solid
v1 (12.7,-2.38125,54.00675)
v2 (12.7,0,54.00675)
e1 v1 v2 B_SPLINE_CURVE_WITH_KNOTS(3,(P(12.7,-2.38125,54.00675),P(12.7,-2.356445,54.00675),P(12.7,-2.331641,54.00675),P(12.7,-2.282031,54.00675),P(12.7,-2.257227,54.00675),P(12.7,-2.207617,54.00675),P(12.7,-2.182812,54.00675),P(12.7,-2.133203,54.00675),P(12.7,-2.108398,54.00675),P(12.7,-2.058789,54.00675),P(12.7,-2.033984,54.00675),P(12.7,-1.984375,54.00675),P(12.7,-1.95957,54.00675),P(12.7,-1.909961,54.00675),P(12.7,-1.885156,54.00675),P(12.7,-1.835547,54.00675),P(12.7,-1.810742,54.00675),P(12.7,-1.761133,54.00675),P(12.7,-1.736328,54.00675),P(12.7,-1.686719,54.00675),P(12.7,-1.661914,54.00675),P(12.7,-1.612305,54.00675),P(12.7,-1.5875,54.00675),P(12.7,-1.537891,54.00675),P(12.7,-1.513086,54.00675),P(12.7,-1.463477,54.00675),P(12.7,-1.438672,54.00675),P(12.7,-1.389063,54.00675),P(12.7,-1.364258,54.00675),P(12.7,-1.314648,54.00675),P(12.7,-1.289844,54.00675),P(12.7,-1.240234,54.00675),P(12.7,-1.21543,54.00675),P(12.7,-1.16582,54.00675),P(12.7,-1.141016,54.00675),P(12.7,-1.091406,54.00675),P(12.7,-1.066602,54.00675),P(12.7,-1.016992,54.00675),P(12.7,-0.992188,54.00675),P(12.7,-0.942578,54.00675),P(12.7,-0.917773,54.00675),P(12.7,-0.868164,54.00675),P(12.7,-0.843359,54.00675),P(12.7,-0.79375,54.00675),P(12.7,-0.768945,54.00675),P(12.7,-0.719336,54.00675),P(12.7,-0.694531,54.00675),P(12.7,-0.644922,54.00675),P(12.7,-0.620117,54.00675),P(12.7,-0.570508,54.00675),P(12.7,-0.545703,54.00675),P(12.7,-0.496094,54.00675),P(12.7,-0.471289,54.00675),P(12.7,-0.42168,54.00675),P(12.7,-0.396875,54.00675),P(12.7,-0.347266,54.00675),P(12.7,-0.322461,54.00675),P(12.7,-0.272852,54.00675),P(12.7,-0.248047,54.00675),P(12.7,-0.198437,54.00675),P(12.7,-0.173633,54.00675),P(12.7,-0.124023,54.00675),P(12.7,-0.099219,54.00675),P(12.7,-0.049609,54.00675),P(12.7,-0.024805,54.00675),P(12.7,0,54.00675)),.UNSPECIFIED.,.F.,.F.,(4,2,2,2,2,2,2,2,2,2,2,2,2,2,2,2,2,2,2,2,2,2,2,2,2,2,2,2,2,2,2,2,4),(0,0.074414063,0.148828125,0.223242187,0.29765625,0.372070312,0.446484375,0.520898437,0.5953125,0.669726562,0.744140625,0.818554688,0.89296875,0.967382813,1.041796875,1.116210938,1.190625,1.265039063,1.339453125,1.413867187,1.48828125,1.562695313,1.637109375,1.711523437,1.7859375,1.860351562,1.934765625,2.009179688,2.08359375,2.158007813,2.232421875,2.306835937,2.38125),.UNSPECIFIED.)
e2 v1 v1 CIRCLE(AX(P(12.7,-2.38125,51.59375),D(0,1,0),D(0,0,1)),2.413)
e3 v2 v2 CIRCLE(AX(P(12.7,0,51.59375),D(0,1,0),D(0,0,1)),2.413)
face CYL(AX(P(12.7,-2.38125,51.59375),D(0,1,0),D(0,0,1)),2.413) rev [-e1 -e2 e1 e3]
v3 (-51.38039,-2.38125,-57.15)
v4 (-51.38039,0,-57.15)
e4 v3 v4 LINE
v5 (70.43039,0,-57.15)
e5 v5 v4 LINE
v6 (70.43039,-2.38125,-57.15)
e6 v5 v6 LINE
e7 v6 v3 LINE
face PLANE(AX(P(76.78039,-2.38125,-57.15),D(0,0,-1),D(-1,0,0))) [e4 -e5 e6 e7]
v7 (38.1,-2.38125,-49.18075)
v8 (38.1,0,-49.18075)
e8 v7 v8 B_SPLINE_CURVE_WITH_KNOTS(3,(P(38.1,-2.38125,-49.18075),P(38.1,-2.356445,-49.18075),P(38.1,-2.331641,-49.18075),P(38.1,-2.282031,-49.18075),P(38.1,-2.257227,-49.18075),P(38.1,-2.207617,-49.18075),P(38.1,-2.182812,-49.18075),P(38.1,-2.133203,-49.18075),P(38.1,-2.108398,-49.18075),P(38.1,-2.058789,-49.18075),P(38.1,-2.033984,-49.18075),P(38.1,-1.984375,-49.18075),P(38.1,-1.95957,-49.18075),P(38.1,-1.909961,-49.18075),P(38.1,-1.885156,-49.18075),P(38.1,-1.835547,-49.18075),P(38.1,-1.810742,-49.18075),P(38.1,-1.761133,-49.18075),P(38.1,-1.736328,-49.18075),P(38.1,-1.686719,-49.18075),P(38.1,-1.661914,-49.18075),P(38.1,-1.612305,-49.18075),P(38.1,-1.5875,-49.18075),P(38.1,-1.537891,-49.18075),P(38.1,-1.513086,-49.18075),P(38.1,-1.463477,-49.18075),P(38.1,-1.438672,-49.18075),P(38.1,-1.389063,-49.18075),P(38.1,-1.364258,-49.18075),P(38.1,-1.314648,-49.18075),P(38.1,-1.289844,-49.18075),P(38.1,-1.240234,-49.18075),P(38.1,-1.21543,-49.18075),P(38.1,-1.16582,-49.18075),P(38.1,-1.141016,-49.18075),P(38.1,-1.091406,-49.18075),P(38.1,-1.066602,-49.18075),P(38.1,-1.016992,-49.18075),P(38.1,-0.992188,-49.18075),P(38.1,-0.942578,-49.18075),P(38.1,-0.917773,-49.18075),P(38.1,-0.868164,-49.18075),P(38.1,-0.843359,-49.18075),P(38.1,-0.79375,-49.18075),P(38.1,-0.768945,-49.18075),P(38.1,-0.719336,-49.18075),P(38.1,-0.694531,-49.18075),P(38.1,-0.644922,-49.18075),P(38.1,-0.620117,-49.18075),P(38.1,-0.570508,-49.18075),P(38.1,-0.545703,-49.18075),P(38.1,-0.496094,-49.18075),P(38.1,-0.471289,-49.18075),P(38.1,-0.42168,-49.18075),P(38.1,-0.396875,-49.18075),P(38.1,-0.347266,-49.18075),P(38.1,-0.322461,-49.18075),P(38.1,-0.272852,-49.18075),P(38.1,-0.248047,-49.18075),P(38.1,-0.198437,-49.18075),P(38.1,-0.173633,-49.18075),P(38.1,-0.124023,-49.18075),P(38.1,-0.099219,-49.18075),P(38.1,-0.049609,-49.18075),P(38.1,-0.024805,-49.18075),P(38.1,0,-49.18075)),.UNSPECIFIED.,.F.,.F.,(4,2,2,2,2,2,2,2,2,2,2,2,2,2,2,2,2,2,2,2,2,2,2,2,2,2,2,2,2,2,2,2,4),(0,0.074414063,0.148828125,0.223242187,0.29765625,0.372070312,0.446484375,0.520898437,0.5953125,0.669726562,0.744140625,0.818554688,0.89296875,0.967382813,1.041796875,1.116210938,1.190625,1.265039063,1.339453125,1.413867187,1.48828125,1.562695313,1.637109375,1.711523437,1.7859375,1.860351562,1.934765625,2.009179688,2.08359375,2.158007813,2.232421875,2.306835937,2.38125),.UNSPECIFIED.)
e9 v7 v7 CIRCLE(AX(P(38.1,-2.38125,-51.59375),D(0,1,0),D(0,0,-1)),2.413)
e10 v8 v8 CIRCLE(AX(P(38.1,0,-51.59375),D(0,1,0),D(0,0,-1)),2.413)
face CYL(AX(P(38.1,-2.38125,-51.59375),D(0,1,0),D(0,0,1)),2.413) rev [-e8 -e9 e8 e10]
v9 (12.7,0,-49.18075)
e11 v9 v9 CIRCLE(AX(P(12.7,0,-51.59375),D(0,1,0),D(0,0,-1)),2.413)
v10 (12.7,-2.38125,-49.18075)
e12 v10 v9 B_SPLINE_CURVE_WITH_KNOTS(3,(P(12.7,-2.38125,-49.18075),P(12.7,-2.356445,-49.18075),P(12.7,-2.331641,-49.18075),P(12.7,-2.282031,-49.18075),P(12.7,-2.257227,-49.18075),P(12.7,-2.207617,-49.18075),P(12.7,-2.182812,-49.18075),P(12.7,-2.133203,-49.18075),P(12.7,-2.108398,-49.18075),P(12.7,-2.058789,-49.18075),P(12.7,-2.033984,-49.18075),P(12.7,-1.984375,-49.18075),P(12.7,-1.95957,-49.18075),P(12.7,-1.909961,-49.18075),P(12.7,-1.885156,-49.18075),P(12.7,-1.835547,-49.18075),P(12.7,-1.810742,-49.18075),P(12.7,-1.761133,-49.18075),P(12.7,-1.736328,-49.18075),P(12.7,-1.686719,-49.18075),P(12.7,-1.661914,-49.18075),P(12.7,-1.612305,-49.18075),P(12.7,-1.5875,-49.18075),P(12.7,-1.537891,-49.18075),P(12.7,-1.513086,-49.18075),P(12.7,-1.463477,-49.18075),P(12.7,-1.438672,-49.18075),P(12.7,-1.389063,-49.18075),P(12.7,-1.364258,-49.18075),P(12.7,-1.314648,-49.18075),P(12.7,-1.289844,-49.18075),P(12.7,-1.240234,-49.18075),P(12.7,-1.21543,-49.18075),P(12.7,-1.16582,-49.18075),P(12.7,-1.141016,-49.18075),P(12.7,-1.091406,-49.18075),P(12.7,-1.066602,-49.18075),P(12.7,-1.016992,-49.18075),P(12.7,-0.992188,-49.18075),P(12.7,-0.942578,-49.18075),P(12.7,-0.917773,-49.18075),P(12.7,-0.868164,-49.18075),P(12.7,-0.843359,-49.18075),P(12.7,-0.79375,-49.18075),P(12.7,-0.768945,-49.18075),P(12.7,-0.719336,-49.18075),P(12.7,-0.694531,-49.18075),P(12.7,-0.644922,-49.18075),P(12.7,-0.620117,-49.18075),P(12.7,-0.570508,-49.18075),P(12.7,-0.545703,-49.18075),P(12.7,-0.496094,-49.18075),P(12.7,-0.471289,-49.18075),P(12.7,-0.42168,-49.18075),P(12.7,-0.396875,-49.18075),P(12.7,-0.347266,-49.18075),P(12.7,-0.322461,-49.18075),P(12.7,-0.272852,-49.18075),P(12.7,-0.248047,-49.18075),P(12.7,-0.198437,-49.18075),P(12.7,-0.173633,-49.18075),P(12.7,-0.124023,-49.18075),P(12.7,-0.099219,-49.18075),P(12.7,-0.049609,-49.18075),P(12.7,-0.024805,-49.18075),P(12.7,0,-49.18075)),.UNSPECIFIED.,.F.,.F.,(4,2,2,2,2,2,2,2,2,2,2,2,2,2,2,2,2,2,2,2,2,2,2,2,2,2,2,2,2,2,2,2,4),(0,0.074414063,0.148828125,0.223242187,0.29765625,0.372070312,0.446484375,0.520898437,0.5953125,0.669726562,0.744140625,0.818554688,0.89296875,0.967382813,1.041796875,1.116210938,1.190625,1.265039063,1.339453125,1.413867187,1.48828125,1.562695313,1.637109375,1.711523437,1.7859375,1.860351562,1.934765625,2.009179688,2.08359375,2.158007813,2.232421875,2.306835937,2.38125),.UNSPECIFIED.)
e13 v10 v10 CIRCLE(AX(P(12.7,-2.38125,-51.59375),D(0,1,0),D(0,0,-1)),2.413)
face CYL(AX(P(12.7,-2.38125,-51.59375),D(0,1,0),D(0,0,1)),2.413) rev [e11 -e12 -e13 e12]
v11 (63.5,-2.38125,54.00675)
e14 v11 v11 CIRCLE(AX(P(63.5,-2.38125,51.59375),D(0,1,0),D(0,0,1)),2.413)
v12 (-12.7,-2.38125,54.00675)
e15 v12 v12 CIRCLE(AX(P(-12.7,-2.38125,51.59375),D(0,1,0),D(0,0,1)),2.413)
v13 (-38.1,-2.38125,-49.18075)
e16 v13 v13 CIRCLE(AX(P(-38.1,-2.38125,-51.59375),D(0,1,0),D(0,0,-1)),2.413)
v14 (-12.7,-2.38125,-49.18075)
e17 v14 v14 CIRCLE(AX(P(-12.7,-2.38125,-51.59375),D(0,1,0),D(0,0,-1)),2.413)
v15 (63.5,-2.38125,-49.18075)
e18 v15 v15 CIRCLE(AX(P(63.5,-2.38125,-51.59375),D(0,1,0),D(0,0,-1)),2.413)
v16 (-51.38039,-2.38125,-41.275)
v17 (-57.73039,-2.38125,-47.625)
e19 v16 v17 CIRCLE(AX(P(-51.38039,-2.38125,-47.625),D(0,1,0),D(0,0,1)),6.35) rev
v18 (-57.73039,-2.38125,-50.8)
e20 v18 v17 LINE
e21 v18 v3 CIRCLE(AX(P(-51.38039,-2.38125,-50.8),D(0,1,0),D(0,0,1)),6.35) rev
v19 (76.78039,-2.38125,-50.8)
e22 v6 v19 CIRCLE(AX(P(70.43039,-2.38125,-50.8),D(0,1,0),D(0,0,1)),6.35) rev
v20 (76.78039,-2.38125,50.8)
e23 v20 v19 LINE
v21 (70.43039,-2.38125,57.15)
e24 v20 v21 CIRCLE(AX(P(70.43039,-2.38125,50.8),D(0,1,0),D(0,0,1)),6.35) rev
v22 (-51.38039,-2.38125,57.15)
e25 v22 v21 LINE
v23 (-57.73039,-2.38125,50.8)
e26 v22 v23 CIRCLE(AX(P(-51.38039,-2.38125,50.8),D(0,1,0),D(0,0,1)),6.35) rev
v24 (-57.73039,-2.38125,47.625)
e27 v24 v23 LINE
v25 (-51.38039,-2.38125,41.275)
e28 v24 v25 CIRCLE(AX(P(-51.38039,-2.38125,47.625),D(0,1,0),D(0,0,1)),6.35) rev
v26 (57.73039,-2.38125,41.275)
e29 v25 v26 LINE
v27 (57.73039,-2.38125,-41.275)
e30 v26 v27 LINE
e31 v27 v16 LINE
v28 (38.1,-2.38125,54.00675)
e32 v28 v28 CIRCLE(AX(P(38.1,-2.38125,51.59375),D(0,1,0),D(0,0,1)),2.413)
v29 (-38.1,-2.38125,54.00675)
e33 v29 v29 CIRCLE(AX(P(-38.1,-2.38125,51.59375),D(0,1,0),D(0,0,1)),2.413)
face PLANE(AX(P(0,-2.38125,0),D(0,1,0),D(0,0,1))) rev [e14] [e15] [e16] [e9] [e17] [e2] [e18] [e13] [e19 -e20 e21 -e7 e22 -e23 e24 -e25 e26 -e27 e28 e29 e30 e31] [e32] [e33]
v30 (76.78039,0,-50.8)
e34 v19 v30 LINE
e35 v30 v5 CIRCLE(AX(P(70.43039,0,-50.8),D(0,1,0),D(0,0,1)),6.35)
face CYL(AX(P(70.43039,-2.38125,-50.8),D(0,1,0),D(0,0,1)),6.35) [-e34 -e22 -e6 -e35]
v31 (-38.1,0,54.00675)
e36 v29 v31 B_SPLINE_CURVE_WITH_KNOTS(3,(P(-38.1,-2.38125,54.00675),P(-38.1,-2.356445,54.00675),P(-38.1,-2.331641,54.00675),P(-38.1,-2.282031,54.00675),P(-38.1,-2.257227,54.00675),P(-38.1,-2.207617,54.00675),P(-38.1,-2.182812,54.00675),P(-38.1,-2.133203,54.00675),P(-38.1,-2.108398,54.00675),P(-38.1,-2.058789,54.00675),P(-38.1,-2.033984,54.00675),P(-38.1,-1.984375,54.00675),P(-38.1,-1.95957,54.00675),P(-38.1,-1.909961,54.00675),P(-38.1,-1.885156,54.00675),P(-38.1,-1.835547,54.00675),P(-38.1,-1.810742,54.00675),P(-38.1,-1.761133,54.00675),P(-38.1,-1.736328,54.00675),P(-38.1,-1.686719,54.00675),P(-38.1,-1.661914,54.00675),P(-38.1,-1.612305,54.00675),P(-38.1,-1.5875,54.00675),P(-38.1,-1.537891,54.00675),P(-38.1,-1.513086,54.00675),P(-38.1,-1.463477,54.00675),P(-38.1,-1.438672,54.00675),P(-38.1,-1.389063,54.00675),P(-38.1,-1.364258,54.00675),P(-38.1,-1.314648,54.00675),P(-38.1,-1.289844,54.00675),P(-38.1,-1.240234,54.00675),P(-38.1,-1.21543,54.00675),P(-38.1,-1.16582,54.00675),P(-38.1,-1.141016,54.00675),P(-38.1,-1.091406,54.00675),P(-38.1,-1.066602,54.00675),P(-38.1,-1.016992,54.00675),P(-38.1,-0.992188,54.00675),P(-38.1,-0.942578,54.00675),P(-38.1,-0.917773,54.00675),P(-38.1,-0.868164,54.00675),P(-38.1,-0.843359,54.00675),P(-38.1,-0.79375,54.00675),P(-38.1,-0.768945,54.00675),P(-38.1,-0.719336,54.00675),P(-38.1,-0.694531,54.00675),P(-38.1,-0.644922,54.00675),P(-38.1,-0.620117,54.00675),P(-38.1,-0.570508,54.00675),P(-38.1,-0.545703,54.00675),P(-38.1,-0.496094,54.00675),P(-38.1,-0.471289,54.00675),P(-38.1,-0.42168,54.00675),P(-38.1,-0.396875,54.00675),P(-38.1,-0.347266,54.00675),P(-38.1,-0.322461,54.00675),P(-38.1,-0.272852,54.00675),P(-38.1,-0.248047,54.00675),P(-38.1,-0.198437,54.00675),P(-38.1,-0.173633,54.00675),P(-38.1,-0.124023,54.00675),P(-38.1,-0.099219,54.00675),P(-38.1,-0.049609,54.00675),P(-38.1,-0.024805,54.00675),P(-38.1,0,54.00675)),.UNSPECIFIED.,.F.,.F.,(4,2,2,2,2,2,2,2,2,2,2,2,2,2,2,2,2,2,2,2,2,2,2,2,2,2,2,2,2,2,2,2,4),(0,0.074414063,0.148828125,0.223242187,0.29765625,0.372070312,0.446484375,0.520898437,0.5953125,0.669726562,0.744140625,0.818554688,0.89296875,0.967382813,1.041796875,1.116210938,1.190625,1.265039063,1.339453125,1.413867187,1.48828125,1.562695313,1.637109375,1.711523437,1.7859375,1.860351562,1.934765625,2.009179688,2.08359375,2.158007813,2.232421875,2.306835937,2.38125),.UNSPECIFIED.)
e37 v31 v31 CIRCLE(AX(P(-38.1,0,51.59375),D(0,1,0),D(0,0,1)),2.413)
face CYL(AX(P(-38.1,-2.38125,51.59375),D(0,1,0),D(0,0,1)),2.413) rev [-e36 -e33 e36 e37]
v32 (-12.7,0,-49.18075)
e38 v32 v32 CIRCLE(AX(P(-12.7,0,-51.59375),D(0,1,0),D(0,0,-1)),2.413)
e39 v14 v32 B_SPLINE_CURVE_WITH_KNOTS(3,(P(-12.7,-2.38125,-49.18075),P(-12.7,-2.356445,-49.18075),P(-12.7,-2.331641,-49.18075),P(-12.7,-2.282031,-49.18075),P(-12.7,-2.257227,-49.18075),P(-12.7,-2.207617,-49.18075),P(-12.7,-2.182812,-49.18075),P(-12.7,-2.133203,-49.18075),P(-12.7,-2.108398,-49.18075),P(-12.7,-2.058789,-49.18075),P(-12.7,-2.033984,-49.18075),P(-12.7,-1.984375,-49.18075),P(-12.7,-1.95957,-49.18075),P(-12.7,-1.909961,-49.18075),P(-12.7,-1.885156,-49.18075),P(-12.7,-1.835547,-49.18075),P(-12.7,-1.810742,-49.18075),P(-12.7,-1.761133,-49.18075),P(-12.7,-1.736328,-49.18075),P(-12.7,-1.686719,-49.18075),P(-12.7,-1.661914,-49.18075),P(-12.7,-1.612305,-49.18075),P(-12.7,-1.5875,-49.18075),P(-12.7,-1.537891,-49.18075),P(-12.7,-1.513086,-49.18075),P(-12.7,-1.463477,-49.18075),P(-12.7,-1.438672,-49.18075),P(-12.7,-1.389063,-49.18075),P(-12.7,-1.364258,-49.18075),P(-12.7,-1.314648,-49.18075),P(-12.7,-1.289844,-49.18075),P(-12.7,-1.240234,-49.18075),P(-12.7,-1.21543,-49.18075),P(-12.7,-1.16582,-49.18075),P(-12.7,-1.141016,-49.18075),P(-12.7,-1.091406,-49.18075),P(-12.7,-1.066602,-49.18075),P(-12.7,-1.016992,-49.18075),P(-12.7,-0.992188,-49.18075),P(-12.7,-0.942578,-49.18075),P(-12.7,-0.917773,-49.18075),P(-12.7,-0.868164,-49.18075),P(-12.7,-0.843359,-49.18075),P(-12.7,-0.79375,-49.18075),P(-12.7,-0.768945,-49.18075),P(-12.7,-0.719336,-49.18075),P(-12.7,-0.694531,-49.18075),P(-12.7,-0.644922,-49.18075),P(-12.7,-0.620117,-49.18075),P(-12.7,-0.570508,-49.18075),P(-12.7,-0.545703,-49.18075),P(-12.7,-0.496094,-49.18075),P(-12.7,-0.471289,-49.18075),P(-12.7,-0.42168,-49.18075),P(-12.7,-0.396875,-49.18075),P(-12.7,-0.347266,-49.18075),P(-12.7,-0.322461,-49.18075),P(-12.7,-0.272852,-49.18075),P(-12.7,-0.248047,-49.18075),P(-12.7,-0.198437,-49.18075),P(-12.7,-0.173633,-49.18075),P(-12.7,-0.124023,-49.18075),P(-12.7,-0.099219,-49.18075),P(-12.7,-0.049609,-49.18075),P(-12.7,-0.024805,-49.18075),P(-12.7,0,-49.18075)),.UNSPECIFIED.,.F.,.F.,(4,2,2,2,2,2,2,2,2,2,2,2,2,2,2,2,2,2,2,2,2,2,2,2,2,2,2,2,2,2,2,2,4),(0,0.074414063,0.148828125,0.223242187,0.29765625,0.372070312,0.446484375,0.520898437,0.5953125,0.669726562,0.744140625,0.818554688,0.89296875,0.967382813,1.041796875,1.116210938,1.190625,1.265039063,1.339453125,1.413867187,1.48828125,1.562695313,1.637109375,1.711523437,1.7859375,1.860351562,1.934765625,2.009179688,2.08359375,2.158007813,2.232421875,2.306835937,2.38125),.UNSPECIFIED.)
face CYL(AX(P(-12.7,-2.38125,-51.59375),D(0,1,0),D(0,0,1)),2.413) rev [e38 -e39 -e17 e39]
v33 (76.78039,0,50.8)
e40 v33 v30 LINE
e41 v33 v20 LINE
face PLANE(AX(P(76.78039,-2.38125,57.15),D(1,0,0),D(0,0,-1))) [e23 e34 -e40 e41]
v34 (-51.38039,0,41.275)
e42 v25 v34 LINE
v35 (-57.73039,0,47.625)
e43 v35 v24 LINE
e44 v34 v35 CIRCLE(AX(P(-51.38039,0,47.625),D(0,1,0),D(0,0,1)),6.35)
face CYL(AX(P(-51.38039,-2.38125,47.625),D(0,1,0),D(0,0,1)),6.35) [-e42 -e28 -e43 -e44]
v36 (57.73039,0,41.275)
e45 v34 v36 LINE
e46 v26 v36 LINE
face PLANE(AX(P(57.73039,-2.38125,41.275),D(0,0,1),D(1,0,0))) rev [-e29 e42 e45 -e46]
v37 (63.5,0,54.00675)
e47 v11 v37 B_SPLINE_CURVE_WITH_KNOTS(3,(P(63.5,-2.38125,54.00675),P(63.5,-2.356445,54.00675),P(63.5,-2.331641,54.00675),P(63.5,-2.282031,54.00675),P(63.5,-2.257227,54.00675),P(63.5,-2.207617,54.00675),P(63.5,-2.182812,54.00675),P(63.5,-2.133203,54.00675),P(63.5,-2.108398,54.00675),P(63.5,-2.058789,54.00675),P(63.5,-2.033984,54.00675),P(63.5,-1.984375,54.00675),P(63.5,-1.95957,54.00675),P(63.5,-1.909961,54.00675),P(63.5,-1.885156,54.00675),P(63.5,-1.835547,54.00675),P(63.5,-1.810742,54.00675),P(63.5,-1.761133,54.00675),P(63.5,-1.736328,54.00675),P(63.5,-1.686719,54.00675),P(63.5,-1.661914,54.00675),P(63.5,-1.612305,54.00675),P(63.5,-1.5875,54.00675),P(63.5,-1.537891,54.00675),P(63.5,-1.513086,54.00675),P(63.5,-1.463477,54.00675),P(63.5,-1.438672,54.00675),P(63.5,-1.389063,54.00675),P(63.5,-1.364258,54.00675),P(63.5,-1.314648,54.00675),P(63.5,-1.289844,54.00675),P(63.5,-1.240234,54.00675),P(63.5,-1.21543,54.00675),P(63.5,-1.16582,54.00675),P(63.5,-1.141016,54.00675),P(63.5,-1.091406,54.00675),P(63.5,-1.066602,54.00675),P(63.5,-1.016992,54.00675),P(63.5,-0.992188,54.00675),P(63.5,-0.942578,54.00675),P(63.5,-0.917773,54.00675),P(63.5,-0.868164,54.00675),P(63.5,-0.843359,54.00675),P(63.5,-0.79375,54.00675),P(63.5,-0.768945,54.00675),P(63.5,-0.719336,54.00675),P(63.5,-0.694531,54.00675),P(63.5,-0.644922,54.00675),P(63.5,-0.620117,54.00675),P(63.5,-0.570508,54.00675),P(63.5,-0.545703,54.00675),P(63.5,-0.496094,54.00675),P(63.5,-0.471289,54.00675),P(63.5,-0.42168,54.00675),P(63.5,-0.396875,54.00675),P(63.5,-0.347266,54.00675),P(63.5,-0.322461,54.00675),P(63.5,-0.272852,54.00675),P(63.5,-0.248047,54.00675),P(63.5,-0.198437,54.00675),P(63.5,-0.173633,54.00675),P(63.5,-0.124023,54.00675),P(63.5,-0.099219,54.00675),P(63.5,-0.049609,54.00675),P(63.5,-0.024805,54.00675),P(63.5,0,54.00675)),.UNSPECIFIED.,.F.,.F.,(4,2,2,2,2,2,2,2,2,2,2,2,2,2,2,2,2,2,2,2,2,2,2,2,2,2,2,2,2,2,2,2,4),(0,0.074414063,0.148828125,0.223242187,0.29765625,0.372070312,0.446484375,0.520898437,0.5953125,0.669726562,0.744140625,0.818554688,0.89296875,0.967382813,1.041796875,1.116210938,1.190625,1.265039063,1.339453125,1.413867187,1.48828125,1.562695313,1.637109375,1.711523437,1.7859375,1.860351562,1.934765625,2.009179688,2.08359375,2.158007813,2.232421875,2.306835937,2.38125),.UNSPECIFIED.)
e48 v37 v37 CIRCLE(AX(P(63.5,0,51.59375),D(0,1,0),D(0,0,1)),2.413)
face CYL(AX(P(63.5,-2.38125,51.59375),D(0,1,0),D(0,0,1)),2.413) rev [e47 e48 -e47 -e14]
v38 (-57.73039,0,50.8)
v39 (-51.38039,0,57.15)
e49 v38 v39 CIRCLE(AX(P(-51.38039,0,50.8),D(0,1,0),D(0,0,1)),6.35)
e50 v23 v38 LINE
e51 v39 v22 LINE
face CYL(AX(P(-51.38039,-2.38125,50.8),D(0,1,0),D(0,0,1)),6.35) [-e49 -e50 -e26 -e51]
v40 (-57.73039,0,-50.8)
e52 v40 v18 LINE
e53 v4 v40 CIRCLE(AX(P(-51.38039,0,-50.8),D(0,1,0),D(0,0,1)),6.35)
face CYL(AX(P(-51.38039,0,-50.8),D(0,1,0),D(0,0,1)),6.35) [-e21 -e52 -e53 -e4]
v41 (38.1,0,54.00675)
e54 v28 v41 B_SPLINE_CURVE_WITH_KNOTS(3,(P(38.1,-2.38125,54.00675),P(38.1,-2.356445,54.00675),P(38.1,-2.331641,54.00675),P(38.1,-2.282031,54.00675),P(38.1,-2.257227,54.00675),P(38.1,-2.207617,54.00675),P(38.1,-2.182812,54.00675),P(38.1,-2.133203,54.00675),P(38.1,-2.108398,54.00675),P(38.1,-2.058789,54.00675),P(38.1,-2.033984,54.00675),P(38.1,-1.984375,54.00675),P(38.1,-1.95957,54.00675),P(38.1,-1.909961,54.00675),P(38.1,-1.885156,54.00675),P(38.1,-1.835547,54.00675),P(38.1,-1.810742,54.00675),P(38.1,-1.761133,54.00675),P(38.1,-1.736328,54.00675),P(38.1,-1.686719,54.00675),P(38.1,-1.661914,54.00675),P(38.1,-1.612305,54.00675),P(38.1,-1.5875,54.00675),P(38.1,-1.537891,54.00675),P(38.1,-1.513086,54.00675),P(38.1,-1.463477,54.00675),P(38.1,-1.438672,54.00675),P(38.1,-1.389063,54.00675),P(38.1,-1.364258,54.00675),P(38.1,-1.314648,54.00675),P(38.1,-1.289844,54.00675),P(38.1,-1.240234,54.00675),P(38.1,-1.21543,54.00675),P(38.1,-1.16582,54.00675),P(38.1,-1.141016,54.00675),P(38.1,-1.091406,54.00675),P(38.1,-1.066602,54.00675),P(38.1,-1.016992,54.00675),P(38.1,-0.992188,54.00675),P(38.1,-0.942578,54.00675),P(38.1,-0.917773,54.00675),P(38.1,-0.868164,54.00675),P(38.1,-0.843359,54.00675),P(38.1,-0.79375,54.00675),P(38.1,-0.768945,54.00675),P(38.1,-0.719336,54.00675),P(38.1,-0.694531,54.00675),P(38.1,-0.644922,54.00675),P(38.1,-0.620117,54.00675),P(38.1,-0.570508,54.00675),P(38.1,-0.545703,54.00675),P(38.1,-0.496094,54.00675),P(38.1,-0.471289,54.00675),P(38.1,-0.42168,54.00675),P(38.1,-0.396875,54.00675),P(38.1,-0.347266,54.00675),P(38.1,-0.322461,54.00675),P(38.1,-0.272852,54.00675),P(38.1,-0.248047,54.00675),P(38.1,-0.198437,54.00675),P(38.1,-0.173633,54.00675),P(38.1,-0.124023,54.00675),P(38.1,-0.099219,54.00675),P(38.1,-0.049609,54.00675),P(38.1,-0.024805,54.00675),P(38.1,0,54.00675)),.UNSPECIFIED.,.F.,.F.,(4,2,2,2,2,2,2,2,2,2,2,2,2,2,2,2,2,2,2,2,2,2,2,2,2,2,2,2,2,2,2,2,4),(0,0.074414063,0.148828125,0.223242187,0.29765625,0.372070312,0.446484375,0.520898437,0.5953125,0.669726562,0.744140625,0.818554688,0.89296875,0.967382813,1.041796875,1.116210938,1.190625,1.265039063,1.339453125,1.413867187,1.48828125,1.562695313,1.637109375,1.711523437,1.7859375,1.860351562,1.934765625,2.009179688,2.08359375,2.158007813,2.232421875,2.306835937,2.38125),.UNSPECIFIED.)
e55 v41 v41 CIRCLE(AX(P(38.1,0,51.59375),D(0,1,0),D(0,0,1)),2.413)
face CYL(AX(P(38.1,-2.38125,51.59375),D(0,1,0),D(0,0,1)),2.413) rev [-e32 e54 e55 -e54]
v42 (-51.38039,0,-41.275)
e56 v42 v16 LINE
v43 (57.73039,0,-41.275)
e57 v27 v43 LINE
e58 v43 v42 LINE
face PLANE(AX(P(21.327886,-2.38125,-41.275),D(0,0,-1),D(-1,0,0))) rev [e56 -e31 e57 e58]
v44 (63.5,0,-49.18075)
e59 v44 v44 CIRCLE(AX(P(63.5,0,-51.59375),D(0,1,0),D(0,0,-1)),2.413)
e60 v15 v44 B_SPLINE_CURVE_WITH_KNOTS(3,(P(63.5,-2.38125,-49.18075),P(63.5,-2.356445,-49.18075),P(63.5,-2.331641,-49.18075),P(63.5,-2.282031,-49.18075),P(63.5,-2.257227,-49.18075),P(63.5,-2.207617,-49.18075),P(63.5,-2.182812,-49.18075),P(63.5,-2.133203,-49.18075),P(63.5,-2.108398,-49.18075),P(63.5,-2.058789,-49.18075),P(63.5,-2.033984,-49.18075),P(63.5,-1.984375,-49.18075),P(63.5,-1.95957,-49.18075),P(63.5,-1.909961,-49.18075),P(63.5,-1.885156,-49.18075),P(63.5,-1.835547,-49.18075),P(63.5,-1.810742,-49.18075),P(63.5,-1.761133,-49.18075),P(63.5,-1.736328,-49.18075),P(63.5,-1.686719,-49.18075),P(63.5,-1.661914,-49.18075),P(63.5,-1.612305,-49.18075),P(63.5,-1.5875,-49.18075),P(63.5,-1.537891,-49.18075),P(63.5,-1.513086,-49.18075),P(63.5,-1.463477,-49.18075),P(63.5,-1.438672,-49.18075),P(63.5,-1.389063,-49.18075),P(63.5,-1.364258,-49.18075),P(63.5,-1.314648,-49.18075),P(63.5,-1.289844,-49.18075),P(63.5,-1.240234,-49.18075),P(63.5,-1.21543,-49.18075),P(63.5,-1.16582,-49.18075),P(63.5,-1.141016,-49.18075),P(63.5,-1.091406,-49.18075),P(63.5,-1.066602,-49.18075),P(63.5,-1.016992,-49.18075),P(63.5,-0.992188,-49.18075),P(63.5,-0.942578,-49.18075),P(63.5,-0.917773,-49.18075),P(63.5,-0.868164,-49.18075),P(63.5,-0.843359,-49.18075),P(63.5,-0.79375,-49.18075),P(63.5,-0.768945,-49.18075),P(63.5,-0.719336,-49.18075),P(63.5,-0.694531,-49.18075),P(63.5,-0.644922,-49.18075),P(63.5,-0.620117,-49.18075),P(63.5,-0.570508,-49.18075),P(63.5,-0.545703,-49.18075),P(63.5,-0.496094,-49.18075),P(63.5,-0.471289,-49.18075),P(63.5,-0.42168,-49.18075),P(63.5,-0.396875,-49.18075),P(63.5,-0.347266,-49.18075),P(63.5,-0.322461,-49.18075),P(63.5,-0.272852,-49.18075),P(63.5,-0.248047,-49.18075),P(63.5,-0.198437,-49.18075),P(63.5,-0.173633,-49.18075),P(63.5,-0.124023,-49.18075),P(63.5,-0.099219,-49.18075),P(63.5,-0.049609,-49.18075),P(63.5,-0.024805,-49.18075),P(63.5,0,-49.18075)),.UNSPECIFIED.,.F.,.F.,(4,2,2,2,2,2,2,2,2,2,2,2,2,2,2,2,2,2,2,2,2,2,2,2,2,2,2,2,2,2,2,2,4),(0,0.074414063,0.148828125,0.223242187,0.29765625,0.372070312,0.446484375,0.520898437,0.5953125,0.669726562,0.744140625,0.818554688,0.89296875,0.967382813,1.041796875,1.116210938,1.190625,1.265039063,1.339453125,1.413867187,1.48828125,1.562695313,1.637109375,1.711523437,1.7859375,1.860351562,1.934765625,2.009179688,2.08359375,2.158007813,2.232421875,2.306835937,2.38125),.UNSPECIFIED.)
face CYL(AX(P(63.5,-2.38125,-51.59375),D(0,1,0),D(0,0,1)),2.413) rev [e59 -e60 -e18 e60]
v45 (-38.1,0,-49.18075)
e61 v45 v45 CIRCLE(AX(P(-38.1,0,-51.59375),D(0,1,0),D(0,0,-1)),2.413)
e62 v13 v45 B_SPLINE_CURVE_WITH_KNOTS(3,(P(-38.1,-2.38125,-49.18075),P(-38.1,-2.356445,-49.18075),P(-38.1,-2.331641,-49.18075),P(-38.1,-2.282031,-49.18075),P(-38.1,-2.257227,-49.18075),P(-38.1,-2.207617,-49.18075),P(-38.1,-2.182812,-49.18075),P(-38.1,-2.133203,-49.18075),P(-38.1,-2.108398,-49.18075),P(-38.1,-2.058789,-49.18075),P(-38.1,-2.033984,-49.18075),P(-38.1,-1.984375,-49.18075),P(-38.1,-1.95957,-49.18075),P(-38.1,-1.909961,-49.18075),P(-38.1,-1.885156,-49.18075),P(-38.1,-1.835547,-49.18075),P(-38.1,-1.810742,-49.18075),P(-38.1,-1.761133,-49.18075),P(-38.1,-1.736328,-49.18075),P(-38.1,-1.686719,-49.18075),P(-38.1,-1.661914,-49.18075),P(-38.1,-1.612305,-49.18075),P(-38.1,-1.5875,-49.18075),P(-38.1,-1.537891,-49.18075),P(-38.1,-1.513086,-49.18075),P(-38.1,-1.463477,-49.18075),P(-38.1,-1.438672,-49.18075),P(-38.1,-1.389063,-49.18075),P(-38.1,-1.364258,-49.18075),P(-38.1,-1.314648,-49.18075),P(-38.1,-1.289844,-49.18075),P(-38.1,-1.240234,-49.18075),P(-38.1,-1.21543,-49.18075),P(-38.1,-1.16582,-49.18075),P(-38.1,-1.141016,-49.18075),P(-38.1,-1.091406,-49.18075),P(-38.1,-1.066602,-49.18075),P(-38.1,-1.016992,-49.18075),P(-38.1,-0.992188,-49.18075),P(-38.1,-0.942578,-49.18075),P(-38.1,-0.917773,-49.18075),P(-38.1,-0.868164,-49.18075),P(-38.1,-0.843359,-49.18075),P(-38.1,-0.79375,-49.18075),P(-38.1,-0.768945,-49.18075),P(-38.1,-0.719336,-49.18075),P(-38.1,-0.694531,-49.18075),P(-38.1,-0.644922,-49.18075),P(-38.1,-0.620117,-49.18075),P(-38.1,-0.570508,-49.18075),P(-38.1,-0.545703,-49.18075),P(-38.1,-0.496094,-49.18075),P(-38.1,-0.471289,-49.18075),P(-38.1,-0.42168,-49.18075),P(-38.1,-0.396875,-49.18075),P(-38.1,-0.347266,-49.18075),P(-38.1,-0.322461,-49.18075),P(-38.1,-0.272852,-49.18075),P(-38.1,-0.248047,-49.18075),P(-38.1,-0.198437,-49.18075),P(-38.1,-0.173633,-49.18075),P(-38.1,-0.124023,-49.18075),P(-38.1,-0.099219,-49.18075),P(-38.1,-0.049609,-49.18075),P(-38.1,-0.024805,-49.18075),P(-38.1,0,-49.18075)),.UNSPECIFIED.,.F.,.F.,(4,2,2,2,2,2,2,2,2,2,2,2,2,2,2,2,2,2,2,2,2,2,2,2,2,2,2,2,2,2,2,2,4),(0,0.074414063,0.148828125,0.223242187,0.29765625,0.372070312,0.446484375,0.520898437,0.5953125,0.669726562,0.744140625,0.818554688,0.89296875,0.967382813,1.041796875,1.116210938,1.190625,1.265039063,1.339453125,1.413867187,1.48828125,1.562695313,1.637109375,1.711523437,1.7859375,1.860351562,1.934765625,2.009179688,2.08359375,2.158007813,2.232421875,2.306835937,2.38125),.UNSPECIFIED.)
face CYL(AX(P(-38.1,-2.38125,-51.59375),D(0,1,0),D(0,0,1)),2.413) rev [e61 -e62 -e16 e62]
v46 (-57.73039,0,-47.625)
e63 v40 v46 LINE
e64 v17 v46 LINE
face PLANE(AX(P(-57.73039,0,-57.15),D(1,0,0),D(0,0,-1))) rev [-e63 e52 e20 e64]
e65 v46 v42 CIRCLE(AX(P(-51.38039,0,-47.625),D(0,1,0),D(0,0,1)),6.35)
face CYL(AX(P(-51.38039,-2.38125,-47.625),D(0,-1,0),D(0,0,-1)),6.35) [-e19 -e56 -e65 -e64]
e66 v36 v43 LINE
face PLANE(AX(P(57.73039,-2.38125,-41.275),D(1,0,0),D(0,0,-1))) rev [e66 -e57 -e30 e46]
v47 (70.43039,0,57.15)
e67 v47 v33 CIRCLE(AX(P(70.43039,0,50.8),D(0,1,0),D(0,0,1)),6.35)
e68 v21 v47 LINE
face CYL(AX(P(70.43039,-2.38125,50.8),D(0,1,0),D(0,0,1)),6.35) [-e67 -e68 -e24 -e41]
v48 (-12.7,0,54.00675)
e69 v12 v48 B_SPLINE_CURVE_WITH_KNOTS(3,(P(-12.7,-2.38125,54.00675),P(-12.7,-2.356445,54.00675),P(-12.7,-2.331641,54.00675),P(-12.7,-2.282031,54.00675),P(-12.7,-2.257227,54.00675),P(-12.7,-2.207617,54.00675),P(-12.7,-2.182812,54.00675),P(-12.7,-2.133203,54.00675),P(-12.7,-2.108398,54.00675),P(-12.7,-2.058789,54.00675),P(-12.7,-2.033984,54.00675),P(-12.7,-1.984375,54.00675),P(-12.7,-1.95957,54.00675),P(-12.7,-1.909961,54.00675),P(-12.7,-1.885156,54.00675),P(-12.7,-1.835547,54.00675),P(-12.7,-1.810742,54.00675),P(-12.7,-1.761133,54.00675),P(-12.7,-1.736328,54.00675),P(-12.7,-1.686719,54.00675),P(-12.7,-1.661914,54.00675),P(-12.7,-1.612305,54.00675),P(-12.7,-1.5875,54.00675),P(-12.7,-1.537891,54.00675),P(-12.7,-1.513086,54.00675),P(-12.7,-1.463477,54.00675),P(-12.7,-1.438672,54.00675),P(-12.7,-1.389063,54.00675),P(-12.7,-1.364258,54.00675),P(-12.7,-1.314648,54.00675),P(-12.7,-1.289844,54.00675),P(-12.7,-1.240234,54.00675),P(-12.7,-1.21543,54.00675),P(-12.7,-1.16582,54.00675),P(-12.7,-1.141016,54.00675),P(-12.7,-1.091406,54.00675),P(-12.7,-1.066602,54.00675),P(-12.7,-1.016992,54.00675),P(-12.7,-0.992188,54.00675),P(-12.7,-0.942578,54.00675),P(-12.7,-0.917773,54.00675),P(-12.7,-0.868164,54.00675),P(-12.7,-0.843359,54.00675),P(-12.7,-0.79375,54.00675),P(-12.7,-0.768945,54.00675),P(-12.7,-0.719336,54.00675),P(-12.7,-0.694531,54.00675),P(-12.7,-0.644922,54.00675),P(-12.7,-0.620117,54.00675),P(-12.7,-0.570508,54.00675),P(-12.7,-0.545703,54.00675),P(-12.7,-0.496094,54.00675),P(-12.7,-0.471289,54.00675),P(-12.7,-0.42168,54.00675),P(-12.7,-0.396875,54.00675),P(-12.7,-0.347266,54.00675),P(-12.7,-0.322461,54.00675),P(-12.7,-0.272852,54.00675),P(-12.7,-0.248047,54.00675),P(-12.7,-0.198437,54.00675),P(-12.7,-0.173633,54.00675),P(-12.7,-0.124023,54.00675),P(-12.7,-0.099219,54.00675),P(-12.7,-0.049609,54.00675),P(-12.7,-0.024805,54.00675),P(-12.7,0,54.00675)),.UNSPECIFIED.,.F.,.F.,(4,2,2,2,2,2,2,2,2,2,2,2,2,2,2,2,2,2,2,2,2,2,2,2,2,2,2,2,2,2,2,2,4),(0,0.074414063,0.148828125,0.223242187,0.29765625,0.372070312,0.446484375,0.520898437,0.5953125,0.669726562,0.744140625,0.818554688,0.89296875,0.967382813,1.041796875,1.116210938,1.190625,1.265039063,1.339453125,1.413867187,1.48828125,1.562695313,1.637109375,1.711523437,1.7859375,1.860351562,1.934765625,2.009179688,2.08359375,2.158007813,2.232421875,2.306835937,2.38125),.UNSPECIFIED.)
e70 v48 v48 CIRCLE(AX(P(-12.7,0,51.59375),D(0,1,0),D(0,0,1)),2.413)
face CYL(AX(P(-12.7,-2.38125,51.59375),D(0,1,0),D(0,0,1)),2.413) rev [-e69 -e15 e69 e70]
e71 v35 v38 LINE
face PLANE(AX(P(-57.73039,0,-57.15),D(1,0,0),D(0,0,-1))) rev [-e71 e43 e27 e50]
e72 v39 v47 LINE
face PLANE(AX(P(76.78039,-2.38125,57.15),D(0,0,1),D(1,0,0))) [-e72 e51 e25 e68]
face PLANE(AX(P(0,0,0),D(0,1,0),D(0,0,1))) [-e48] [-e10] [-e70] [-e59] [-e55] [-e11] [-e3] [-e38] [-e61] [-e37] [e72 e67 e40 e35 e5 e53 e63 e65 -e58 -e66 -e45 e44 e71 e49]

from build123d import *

# Parameters (mm, degrees)
SKETCH1_W          = 153.56078
SKETCH1_H          = 114.3
SKETCH1_R          = 2.413
BASE_FLANGE1_DEPTH = 2.38125
FILLET1_R          = 6.35
SKETCH7_W          = 19.05
SKETCH7_H          = 114.3
CUT_EXTRUDE2_DEPTH = 2.54
FILLET2_R          = 6.35


# Sheet-metal steps are written as plain solids
with BuildPart() as part:
    # Sketch1 → Base-Flange1 (new body)
    with BuildSketch(Plane(origin=(0, 0, 0), x_dir=(1, 0, 0), z_dir=(0, 1, 0))):
        Rectangle(SKETCH1_W, SKETCH1_H)
        with Locations(Location((-63.5, -51.59375, 0), (0, 0, 270))):
            Circle(SKETCH1_R, mode=Mode.SUBTRACT)
        with Locations(Location((-38.1, -51.59375, 0), (0, 0, 270))):
            Circle(SKETCH1_R, mode=Mode.SUBTRACT)
        with Locations(Location((-12.7, -51.59375, 0), (0, 0, 270))):
            Circle(SKETCH1_R, mode=Mode.SUBTRACT)
        with Locations(Location((12.7, -51.59375, 0), (0, 0, 270))):
            Circle(SKETCH1_R, mode=Mode.SUBTRACT)
        with Locations(Location((38.1, -51.59375, 0), (0, 0, 270))):
            Circle(SKETCH1_R, mode=Mode.SUBTRACT)
        with Locations(Location((63.5, -51.59375, 0), (0, 0, 270))):
            Circle(SKETCH1_R, mode=Mode.SUBTRACT)
        with Locations(Location((63.5, 51.59375, 0), (0, 0, 270))):
            Circle(SKETCH1_R, mode=Mode.SUBTRACT)
        with Locations(Location((38.1, 51.59375, 0), (0, 0, 270))):
            Circle(SKETCH1_R, mode=Mode.SUBTRACT)
        with Locations(Location((12.7, 51.59375, 0), (0, 0, 270))):
            Circle(SKETCH1_R, mode=Mode.SUBTRACT)
        with Locations(Location((-12.7, 51.59375, 0), (0, 0, 270))):
            Circle(SKETCH1_R, mode=Mode.SUBTRACT)
        with Locations(Location((-38.1, 51.59375, 0), (0, 0, 270))):
            Circle(SKETCH1_R, mode=Mode.SUBTRACT)
        with Locations(Location((-63.5, 51.59375, 0), (0, 0, 270))):
            Circle(SKETCH1_R, mode=Mode.SUBTRACT)
        Polygon((57.73039, -41.275), (-63.104482091, -41.275), (-63.104482091, 41.275), (21.327886111, 41.275), (57.73039, 41.275), (57.73039, 15.875), align=None, mode=Mode.SUBTRACT)
    extrude(amount=-BASE_FLANGE1_DEPTH)

    # Fillet1
    fillet1_edges = [part.edges().sort_by_distance(p)[0] for p in [
        (-76.78039, -1.190625, -57.15),
        (76.78039, -1.190625, -57.15),
        (76.78039, -1.190625, 57.15),
        (-76.78039, -1.190625, 57.15),
    ]]
    fillet(fillet1_edges, radius=FILLET1_R)

    # Sketch7 → Cut-Extrude2 (cut)
    with BuildSketch(Plane(origin=(0, -2.38125, 0), x_dir=(-1, 0, 0), z_dir=(0, -1, 0))):
        with Locations((67.25539, 0)):
            Rectangle(SKETCH7_W, SKETCH7_H)
    extrude(amount=-CUT_EXTRUDE2_DEPTH, mode=Mode.SUBTRACT)

    # Fillet2
    fillet2_edges = [part.edges().sort_by_distance(p)[0] for p in [
        (-57.73039, -1.190625, 41.275),
        (-57.73039, -1.190625, -41.275),
        (-57.73039, -1.190625, 57.15),
        (-57.73039, -1.190625, -57.15),
    ]]
    fillet(fillet2_edges, radius=FILLET2_R)


solid = part.part
